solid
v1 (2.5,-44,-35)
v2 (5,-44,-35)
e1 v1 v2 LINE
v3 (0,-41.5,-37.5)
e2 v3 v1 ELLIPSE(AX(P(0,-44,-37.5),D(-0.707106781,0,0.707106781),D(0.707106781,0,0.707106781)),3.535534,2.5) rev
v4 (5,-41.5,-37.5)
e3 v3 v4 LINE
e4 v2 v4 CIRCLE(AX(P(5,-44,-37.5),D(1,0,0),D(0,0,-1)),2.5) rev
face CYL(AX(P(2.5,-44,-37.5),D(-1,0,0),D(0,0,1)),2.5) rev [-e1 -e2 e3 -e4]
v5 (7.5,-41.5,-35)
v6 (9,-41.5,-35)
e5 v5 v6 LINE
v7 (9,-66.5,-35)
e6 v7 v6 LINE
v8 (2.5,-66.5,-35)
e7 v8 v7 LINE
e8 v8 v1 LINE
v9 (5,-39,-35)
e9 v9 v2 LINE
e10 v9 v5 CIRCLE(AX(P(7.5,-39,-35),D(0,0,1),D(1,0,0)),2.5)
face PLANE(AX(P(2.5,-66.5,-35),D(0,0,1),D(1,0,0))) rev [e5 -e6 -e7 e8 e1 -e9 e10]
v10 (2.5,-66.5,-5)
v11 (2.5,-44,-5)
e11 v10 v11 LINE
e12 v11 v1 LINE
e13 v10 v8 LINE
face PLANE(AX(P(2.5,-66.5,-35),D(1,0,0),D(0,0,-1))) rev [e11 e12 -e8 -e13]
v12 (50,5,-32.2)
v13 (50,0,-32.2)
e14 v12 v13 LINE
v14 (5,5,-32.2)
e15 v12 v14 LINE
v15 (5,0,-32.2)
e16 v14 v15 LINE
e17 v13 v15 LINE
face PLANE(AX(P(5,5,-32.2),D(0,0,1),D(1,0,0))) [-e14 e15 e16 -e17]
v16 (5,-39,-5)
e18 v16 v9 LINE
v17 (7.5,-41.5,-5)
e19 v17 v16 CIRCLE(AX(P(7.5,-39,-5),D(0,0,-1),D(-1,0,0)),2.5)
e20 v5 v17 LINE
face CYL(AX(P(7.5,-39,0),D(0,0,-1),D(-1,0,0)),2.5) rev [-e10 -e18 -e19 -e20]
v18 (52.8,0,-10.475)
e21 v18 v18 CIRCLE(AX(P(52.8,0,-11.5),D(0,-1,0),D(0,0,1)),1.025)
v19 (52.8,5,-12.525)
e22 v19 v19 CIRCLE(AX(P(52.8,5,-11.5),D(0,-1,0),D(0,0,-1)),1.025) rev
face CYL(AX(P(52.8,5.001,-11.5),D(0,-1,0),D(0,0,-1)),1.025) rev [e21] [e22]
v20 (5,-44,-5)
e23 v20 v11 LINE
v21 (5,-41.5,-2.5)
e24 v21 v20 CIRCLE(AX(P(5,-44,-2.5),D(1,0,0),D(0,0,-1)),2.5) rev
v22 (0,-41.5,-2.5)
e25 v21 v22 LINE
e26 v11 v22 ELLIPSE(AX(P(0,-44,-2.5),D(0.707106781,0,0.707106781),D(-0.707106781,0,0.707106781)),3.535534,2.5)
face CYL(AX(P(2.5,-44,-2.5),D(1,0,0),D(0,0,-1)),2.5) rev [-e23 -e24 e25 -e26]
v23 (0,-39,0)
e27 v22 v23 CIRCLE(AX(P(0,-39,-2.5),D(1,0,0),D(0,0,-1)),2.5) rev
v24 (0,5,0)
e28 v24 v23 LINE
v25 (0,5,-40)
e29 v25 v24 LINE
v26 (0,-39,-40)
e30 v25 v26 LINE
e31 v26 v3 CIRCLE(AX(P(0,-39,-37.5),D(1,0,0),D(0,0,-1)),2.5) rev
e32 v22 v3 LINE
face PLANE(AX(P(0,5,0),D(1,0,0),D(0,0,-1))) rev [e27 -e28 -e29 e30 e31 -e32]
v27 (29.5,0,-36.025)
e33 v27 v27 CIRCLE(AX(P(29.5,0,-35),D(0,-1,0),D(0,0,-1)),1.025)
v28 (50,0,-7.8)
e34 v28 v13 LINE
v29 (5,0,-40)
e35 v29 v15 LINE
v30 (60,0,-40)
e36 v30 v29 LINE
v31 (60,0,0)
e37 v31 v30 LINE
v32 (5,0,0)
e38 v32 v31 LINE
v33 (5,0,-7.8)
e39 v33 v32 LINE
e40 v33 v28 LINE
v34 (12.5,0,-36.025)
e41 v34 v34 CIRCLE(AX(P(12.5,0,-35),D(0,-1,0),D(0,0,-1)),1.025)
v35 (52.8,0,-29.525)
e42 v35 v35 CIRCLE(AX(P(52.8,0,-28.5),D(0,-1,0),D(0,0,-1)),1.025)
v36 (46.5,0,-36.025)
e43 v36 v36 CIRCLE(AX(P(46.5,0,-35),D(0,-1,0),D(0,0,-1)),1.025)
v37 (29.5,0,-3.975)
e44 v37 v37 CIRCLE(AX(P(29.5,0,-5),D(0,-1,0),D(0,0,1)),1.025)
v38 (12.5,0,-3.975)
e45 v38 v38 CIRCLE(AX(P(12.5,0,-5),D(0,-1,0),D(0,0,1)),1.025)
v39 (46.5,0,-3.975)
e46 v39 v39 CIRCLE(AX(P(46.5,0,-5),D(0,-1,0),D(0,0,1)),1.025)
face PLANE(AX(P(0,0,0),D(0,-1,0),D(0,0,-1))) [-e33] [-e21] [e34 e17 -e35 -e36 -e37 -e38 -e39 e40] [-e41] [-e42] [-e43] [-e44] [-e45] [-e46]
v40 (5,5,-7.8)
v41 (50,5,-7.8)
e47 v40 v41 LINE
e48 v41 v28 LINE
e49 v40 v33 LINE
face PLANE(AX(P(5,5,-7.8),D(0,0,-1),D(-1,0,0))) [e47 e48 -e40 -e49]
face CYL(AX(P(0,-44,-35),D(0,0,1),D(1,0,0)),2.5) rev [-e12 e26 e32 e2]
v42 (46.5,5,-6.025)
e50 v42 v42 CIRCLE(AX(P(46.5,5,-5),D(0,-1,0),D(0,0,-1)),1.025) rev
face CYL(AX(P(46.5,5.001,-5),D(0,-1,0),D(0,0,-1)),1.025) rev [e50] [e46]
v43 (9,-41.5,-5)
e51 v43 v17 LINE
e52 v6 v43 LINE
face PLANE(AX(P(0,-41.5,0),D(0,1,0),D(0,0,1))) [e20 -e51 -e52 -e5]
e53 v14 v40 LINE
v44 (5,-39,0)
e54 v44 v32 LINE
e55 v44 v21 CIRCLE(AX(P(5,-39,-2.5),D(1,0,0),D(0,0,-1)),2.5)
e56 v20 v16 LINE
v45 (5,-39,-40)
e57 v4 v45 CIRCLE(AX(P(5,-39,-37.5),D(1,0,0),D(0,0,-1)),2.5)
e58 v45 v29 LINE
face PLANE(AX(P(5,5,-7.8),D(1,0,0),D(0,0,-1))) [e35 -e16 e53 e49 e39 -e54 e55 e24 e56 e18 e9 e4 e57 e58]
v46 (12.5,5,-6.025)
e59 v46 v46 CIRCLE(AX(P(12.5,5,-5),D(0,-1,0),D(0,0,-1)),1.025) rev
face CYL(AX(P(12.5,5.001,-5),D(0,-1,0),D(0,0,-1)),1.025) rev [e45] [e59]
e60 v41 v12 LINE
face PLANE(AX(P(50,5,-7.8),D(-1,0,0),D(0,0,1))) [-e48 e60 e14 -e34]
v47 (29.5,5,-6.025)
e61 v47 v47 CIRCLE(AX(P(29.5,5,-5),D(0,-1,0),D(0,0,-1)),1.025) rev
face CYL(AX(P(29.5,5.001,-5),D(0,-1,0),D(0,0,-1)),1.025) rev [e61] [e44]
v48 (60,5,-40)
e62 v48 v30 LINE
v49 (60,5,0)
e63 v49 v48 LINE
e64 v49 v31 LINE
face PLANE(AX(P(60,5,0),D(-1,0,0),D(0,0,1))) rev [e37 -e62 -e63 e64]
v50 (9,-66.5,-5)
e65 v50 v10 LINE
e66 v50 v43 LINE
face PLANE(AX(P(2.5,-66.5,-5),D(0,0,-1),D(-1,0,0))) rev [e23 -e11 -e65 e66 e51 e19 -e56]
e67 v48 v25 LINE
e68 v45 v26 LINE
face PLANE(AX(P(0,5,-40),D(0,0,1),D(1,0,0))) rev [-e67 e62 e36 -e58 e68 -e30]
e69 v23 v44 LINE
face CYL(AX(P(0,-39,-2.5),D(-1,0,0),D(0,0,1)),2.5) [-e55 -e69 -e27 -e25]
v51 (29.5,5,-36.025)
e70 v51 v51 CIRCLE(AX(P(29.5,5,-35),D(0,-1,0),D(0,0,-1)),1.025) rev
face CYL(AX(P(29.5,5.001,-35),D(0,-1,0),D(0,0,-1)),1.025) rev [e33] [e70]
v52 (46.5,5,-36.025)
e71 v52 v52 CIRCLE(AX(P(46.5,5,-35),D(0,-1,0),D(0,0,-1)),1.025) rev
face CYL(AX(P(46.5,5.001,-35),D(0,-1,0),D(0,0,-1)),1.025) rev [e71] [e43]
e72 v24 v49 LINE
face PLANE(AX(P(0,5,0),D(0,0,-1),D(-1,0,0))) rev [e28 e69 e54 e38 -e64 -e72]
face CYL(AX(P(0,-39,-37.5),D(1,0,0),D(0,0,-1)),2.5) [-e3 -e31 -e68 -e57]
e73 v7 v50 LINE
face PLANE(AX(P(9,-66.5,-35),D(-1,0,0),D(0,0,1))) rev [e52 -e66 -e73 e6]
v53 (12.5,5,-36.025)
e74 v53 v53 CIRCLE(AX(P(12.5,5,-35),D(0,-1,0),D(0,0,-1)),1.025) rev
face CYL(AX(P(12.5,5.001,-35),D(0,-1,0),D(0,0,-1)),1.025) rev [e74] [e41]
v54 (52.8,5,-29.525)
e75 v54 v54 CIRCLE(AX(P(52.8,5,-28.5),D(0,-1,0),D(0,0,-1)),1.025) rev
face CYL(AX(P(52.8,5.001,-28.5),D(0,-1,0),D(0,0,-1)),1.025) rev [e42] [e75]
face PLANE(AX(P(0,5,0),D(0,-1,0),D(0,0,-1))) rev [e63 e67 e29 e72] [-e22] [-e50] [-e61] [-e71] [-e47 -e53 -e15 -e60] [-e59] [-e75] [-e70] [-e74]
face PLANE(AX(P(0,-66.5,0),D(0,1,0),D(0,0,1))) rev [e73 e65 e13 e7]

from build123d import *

# Parameters (mm, degrees)
SKETCH1_W           = 60
SKETCH1_H           = 40
SKETCH1_W_2         = 45
SKETCH1_H_2         = 24.4
BOSS_EXTRUDE1_DEPTH = 5
SKETCH6_W           = 5
SKETCH6_H           = 40
BOSS_EXTRUDE4_DEPTH = 41.5
SKETCH7_W           = 6.5
SKETCH7_H           = 30
BOSS_EXTRUDE5_DEPTH = 25
FILLET2_R           = 2.5
FILLET3_R           = 2.5
CUT_EXTRUDE1_REACH  = 100.093
SKETCH8_R           = 1.025


with BuildPart() as part:
    # Sketch1 → Boss-Extrude1 (new body)
    with BuildSketch(Plane(origin=(0, 0, 0), x_dir=(1, 0, 0), z_dir=(0, 1, 0))):
        with Locations((30, 20)):
            Rectangle(SKETCH1_W, SKETCH1_H)
        with Locations((27.5, 20)):
            Rectangle(SKETCH1_W_2, SKETCH1_H_2, mode=Mode.SUBTRACT)
    extrude(amount=BOSS_EXTRUDE1_DEPTH)

    # Sketch6 → Boss-Extrude4 (add)
    with BuildSketch(Plane.XZ):
        with Locations((2.5, -20)):
            Rectangle(SKETCH6_W, SKETCH6_H)
    extrude(amount=BOSS_EXTRUDE4_DEPTH)

    # Sketch7 → Boss-Extrude5 (add)
    with BuildSketch(Plane(origin=(0, -41.5, 0), x_dir=(-1, 0, 0), z_dir=(0, -1, 0))):
        with Locations((-5.75, 20)):
            Rectangle(SKETCH7_W, SKETCH7_H)
    extrude(amount=BOSS_EXTRUDE5_DEPTH)

    # Fillet2
    fillet2_edges = [part.edges().sort_by_distance(p)[0] for p in [
        (5, -41.5, -20),
        (2.5, -41.5, -20),
    ]]
    fillet(fillet2_edges, radius=FILLET2_R - 0.0001)  # a hair under: the kernel refuses the full size

    # Fillet3
    fillet3_edges = [part.edges().sort_by_distance(p)[0] for p in [
        (2.50005, -41.5, -5),
        (2.50005, -41.5, -35),
        (2.5, -41.5, 0),
        (2.5, -41.5, -40),
    ]]
    fillet(fillet3_edges, radius=FILLET3_R - 0.0001)  # a hair under: the kernel refuses the full size

    # Sketch8 → Cut-Extrude1 (cut, up to next)
    with BuildSketch(Plane(origin=(0, 0, 0), x_dir=(-1, 0, 0), z_dir=(0, -1, 0)), mode=Mode.PRIVATE) as cut_extrude1_sk1:
        with Locations(Location((-52.8, 28.5, 0), (0, 0, 90))):
            Circle(SKETCH8_R)
    cut_extrude1_tool1 = extrude(cut_extrude1_sk1.sketch, amount=-CUT_EXTRUDE1_REACH, mode=Mode.PRIVATE) & part.part
    # Sketch8 → Cut-Extrude1 (cut, up to next)
    with BuildSketch(Plane(origin=(0, 0, 0), x_dir=(-1, 0, 0), z_dir=(0, -1, 0)), mode=Mode.PRIVATE) as cut_extrude1_sk2:
        with Locations(Location((-46.5, 35, 0), (0, 0, 90))):
            Circle(SKETCH8_R)
    cut_extrude1_tool2 = extrude(cut_extrude1_sk2.sketch, amount=-CUT_EXTRUDE1_REACH, mode=Mode.PRIVATE) & part.part
    # Sketch8 → Cut-Extrude1 (cut, up to next)
    with BuildSketch(Plane(origin=(0, 0, 0), x_dir=(-1, 0, 0), z_dir=(0, -1, 0)), mode=Mode.PRIVATE) as cut_extrude1_sk3:
        with Locations(Location((-29.5, 35, 0), (0, 0, 90))):
            Circle(SKETCH8_R)
    cut_extrude1_tool3 = extrude(cut_extrude1_sk3.sketch, amount=-CUT_EXTRUDE1_REACH, mode=Mode.PRIVATE) & part.part
    # Sketch8 → Cut-Extrude1 (cut, up to next)
    with BuildSketch(Plane(origin=(0, 0, 0), x_dir=(-1, 0, 0), z_dir=(0, -1, 0)), mode=Mode.PRIVATE) as cut_extrude1_sk4:
        with Locations(Location((-12.5, 35, 0), (0, 0, 90))):
            Circle(SKETCH8_R)
    cut_extrude1_tool4 = extrude(cut_extrude1_sk4.sketch, amount=-CUT_EXTRUDE1_REACH, mode=Mode.PRIVATE) & part.part
    # Sketch8 → Cut-Extrude1 (cut, up to next)
    with BuildSketch(Plane(origin=(0, 0, 0), x_dir=(-1, 0, 0), z_dir=(0, -1, 0)), mode=Mode.PRIVATE) as cut_extrude1_sk5:
        with Locations(Location((-12.5, 5, 0), (0, 0, 90))):
            Circle(SKETCH8_R)
    cut_extrude1_tool5 = extrude(cut_extrude1_sk5.sketch, amount=-CUT_EXTRUDE1_REACH, mode=Mode.PRIVATE) & part.part
    # Sketch8 → Cut-Extrude1 (cut, up to next)
    with BuildSketch(Plane(origin=(0, 0, 0), x_dir=(-1, 0, 0), z_dir=(0, -1, 0)), mode=Mode.PRIVATE) as cut_extrude1_sk6:
        with Locations(Location((-29.5, 5, 0), (0, 0, 90))):
            Circle(SKETCH8_R)
    cut_extrude1_tool6 = extrude(cut_extrude1_sk6.sketch, amount=-CUT_EXTRUDE1_REACH, mode=Mode.PRIVATE) & part.part
    # Sketch8 → Cut-Extrude1 (cut, up to next)
    with BuildSketch(Plane(origin=(0, 0, 0), x_dir=(-1, 0, 0), z_dir=(0, -1, 0)), mode=Mode.PRIVATE) as cut_extrude1_sk7:
        with Locations(Location((-46.5, 5, 0), (0, 0, 90))):
            Circle(SKETCH8_R)
    cut_extrude1_tool7 = extrude(cut_extrude1_sk7.sketch, amount=-CUT_EXTRUDE1_REACH, mode=Mode.PRIVATE) & part.part
    # Sketch8 → Cut-Extrude1 (cut, up to next)
    with BuildSketch(Plane(origin=(0, 0, 0), x_dir=(-1, 0, 0), z_dir=(0, -1, 0)), mode=Mode.PRIVATE) as cut_extrude1_sk8:
        with Locations(Location((-52.8, 11.5, 0), (0, 0, 90))):
            Circle(SKETCH8_R)
    cut_extrude1_tool8 = extrude(cut_extrude1_sk8.sketch, amount=-CUT_EXTRUDE1_REACH, mode=Mode.PRIVATE) & part.part
    add(cut_extrude1_tool1.solids().sort_by_distance((52.8, 0, -28.5))[0], mode=Mode.SUBTRACT)
    add(cut_extrude1_tool2.solids().sort_by_distance((46.5, 0, -35))[0], mode=Mode.SUBTRACT)
    add(cut_extrude1_tool3.solids().sort_by_distance((29.5, 0, -35))[0], mode=Mode.SUBTRACT)
    add(cut_extrude1_tool4.solids().sort_by_distance((12.5, 0, -35))[0], mode=Mode.SUBTRACT)
    add(cut_extrude1_tool5.solids().sort_by_distance((12.5, 0, -5))[0], mode=Mode.SUBTRACT)
    add(cut_extrude1_tool6.solids().sort_by_distance((29.5, 0, -5))[0], mode=Mode.SUBTRACT)
    add(cut_extrude1_tool7.solids().sort_by_distance((46.5, 0, -5))[0], mode=Mode.SUBTRACT)
    add(cut_extrude1_tool8.solids().sort_by_distance((52.8, 0, -11.5))[0], mode=Mode.SUBTRACT)


solid = part.part
